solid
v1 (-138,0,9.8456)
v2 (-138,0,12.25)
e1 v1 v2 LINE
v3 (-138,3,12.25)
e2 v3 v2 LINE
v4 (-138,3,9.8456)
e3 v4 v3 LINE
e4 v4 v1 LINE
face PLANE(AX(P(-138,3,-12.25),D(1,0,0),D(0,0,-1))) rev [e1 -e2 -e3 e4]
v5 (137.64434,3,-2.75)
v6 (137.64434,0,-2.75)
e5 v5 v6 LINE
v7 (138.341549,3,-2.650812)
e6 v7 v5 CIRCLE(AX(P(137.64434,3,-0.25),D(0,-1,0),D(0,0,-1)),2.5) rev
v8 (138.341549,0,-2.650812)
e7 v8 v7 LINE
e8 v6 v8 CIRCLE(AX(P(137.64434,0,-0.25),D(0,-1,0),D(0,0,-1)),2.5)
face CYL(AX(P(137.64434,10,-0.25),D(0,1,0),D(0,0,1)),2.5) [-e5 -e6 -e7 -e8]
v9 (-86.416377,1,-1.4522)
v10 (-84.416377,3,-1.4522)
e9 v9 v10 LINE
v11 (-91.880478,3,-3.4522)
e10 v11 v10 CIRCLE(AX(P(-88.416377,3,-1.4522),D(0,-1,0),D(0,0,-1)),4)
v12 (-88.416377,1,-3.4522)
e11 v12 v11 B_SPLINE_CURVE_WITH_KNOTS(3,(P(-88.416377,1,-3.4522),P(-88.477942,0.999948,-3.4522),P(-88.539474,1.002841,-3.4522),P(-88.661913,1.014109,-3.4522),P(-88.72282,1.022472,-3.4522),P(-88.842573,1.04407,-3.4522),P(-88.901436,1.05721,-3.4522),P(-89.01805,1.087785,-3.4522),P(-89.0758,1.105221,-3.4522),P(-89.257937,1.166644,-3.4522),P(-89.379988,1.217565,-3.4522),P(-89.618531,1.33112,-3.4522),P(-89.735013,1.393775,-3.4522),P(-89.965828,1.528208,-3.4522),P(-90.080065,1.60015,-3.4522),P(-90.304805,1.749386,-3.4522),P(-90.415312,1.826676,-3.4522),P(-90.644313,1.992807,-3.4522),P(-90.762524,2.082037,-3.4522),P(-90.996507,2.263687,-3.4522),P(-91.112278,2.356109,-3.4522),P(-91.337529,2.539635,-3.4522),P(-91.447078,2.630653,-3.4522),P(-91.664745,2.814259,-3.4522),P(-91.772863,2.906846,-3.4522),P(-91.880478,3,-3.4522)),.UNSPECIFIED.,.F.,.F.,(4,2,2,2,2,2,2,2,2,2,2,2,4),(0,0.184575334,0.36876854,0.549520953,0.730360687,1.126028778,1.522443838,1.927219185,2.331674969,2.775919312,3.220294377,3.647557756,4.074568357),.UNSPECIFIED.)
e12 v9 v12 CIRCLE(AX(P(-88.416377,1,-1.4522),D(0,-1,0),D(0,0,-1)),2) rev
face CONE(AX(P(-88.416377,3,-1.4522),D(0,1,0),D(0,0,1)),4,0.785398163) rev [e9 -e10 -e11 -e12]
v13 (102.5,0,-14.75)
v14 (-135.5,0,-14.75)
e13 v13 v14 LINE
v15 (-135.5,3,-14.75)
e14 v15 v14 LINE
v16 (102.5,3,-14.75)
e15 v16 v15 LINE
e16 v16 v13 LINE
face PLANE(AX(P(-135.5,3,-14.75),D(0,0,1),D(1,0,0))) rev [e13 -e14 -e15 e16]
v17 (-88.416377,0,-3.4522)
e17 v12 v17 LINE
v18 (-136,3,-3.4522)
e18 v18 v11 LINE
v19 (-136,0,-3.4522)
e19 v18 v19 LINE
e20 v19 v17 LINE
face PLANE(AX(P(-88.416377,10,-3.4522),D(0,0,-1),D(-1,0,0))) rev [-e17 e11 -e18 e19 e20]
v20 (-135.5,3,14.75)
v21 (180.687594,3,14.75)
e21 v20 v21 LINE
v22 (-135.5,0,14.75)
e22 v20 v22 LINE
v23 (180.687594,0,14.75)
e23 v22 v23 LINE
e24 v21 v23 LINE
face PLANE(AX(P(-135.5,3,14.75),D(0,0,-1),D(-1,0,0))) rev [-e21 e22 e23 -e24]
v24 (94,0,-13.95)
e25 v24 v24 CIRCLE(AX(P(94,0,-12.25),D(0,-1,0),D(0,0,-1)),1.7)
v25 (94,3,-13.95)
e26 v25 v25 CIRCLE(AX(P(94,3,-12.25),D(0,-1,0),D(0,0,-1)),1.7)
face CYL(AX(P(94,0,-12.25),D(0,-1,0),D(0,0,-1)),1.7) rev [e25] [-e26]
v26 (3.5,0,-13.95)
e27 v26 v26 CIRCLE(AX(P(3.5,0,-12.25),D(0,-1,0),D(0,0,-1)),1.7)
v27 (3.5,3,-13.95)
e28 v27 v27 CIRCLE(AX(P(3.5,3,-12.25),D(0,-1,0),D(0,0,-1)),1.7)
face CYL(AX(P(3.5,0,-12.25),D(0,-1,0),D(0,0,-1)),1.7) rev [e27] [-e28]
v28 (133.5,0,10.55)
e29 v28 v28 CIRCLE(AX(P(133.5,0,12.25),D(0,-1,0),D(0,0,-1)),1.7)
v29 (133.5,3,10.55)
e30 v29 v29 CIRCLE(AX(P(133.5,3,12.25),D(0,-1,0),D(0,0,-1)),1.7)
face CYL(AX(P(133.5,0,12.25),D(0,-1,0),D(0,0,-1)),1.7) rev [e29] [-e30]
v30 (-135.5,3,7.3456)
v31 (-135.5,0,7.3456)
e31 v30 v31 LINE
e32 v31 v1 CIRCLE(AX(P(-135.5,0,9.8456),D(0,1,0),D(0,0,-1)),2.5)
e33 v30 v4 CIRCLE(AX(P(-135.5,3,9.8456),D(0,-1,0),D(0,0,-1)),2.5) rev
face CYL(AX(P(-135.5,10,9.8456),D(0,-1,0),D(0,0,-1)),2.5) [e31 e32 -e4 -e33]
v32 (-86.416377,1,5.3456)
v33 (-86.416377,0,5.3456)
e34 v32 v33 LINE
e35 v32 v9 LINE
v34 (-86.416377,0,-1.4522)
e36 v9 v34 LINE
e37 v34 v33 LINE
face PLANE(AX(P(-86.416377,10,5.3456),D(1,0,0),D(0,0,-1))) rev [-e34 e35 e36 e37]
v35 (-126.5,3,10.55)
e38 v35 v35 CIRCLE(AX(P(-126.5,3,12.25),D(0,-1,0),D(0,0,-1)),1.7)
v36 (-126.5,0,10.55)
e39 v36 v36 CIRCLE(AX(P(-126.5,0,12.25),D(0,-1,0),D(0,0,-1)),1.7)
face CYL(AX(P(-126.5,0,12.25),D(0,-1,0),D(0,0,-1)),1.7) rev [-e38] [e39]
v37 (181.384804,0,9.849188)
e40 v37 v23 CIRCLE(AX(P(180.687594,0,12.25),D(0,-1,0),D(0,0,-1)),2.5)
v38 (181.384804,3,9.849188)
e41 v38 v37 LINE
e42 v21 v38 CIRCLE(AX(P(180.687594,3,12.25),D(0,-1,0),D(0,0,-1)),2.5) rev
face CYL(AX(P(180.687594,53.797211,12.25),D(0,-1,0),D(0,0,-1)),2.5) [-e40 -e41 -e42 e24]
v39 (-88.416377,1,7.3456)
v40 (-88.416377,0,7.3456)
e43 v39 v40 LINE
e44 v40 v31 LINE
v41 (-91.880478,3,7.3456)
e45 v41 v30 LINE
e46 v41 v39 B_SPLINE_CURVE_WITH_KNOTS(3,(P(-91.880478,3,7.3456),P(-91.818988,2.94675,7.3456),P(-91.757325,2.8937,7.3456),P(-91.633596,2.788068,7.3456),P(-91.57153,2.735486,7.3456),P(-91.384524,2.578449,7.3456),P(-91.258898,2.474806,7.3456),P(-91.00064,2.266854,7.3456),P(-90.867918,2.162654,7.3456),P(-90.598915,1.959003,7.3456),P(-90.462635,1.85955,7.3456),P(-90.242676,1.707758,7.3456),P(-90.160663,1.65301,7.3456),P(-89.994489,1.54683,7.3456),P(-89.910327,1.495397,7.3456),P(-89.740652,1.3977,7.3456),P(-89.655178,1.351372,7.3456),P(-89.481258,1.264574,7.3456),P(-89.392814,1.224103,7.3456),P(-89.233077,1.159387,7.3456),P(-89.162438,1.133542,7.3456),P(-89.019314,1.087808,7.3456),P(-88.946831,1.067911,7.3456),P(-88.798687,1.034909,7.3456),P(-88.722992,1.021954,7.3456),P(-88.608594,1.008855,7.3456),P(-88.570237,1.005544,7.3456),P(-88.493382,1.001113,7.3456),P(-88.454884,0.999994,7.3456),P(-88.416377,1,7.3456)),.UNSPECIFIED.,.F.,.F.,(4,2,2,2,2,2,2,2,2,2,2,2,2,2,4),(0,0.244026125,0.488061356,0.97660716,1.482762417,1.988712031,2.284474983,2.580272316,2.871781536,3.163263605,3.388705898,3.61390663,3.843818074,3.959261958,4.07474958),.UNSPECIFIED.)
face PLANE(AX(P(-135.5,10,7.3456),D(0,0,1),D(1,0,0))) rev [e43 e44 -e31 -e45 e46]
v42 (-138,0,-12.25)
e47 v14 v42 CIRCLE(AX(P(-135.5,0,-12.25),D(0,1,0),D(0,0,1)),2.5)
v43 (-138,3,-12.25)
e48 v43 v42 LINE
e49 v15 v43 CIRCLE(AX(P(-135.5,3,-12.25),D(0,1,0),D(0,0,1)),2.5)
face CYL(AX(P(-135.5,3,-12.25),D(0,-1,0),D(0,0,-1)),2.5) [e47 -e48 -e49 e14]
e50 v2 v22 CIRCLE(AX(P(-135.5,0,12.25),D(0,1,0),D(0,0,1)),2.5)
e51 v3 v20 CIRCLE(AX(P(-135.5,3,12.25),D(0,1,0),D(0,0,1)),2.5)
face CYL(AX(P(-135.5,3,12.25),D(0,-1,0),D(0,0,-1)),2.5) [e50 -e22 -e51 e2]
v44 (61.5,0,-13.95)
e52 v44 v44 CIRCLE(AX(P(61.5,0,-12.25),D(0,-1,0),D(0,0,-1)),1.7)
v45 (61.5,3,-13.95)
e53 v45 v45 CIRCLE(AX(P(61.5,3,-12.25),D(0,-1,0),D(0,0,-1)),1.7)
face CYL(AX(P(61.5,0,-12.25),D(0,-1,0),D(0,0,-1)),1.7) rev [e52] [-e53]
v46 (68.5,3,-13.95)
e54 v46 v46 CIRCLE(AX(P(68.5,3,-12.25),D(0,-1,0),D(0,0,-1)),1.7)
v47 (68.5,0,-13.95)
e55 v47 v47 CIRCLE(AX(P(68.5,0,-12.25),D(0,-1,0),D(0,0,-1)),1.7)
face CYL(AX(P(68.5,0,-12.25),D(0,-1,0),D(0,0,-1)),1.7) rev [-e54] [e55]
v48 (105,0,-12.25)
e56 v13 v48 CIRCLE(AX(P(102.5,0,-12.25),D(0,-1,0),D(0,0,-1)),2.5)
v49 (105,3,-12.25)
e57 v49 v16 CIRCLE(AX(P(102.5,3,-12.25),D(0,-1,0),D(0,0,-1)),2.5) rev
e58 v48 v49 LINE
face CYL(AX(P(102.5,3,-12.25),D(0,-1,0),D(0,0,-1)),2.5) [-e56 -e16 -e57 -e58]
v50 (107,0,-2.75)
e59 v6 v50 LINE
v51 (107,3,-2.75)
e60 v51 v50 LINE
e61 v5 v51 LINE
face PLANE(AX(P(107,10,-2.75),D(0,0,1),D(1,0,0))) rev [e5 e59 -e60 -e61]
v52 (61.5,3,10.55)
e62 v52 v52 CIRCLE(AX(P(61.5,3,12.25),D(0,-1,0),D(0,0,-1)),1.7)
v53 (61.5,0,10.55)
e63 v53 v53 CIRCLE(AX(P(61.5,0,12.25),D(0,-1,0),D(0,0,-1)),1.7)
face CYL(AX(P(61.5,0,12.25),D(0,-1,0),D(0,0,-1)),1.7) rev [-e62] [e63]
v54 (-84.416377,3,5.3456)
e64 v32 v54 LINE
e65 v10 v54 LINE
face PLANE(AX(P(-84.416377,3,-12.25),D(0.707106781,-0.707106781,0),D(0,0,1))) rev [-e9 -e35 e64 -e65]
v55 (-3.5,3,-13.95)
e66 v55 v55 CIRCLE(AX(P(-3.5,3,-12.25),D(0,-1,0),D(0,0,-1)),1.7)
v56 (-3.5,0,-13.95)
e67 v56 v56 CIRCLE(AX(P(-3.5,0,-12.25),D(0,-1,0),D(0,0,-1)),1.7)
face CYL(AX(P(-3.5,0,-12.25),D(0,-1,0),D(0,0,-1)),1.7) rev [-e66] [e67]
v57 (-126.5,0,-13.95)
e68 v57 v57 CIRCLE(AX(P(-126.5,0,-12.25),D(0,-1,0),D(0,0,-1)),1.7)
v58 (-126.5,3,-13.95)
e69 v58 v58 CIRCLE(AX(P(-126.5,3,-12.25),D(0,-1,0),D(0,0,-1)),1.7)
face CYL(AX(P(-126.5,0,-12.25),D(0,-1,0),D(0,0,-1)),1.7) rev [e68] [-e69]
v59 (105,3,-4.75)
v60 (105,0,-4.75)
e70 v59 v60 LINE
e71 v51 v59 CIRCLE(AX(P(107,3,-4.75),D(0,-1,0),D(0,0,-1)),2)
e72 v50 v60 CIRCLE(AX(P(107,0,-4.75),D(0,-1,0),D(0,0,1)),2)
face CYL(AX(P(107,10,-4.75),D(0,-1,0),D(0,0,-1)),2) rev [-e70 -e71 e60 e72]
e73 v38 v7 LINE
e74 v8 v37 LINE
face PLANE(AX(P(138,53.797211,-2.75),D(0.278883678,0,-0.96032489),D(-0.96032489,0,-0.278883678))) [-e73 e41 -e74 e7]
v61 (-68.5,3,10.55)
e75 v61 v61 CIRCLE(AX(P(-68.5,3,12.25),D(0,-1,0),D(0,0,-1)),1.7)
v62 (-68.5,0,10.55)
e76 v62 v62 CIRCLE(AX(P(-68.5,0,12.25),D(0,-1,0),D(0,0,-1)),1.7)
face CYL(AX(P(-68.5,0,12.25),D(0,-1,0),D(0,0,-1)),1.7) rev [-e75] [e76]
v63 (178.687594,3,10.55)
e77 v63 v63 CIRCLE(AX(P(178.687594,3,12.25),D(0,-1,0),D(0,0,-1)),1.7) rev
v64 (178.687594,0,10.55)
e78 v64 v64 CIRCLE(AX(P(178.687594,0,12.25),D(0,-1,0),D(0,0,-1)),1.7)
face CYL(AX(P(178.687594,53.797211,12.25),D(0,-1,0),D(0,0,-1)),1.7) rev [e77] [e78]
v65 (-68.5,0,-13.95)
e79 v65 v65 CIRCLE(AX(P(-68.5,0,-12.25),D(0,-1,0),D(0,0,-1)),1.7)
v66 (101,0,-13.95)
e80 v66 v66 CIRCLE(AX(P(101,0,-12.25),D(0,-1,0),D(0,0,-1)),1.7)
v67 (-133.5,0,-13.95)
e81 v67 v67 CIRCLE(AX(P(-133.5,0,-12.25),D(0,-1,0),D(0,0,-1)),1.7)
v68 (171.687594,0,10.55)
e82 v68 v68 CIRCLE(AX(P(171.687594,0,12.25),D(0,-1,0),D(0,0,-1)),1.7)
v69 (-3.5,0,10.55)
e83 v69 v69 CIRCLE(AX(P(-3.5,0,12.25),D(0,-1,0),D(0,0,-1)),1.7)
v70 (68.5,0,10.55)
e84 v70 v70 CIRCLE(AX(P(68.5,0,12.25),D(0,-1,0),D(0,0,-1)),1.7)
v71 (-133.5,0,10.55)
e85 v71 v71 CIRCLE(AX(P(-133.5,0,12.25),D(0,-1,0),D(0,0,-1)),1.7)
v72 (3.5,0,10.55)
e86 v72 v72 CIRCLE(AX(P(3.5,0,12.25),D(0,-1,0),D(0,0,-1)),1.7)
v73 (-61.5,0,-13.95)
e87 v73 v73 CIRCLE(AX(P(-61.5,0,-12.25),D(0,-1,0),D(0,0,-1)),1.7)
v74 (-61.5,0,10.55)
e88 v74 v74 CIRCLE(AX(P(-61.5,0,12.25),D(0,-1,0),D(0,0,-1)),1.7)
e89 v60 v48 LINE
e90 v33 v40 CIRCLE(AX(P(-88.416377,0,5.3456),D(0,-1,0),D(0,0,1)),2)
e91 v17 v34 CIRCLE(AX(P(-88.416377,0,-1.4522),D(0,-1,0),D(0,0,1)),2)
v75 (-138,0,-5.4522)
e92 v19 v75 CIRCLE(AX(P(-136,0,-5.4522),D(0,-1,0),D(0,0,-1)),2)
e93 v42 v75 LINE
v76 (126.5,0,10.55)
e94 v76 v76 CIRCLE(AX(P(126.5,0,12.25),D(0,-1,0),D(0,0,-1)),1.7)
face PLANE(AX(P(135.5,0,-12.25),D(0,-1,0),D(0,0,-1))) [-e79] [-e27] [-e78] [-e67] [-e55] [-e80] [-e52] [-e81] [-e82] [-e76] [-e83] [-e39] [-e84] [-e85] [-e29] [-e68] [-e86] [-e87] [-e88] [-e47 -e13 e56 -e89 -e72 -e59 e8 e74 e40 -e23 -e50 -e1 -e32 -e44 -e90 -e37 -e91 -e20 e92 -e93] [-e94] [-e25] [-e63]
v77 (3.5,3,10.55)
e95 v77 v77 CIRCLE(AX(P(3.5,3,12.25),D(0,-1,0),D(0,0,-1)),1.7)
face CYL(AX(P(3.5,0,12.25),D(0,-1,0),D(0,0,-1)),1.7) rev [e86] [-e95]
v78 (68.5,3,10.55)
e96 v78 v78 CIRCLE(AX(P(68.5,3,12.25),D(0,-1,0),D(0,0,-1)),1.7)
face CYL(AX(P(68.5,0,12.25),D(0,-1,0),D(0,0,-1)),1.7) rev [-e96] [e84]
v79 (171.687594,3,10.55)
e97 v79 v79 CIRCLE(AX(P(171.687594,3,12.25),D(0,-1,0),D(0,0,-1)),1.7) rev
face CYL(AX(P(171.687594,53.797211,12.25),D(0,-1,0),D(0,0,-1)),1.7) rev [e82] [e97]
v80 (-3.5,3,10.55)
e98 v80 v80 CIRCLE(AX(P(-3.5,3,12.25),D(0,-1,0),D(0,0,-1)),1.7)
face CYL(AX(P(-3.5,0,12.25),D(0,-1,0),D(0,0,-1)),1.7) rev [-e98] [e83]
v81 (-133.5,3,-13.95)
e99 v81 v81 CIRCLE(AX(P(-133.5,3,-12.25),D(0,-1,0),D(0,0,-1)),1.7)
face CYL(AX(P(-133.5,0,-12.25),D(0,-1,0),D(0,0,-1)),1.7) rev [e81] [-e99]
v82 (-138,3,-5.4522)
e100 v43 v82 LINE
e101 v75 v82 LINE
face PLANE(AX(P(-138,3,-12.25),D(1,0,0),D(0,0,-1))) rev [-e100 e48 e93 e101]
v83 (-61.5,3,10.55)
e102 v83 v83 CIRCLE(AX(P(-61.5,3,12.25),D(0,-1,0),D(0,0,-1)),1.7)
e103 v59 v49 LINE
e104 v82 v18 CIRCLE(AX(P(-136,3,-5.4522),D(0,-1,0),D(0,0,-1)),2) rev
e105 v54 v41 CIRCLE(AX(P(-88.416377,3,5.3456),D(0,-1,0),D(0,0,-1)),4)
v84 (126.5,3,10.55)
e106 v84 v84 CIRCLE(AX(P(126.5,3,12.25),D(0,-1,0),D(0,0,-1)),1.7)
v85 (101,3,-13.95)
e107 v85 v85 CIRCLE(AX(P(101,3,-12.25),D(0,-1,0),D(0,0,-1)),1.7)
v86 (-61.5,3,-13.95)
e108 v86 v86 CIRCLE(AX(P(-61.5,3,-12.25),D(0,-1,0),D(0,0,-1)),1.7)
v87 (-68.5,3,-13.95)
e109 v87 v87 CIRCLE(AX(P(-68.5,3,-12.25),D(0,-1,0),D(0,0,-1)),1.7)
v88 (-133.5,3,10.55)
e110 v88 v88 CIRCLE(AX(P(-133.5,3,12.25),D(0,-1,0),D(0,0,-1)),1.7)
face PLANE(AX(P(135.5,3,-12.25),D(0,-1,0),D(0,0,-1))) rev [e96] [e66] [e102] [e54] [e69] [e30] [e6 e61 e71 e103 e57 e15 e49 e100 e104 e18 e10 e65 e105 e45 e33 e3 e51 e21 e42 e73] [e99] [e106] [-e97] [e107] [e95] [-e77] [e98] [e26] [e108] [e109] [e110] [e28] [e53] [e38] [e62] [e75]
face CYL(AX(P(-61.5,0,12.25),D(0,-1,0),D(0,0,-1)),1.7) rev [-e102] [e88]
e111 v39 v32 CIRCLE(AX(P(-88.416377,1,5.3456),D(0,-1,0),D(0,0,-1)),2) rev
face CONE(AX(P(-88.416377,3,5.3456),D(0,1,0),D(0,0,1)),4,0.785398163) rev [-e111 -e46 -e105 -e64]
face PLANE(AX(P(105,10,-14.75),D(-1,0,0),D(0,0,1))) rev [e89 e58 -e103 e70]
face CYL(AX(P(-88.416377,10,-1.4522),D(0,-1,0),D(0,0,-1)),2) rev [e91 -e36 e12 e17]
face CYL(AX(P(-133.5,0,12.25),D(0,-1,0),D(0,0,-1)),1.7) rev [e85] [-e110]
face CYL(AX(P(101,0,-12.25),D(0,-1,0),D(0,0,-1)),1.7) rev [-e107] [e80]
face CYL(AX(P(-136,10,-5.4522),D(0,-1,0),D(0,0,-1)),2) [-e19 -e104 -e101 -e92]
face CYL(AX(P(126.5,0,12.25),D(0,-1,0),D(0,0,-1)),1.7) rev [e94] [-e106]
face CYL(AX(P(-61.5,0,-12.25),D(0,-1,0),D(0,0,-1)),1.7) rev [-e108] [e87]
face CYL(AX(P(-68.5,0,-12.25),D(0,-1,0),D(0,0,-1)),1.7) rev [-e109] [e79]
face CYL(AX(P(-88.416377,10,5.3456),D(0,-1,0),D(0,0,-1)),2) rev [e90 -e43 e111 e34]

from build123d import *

# Parameters (mm, degrees)
BOSS_EXTRUDE1_DEPTH  = 3
M3_CLEARANCE_HOLE1_D = 3.4
CUT_EXTRUDE5_DEPTH   = 10
FILLET3_R            = 2
CHAMFER1_SIZE        = 2
SKETCH30_R           = 1.7
BOSS_EXTRUDE3_DEPTH  = 3
FILLET4_R            = 2.5


with BuildPart() as part:
    # Sketch1 → Boss-Extrude1 (new body)
    with BuildSketch(Plane(origin=(0, 0, 0), x_dir=(1, 0, 0), z_dir=(0, 1, 0))):
        with BuildLine():
            Line((-135.5, 14.75), (135.5, 14.75))
            ThreePointArc((135.5, 14.75), (137.267766953, 14.017766953), (138, 12.25))
            Line((138, 12.25), (138, -12.25))
            ThreePointArc((138, -12.25), (137.267766953, -14.017766953), (135.5, -14.75))
            Line((135.5, -14.75), (-135.5, -14.75))
            ThreePointArc((-135.5, -14.75), (-137.267766953, -14.017766953), (-138, -12.25))
            Line((-138, -12.25), (-138, 12.25))
            ThreePointArc((-138, 12.25), (-137.267766953, 14.017766953), (-135.5, 14.75))
        make_face()
    extrude(amount=BOSS_EXTRUDE1_DEPTH)

    # M3 Clearance Hole1 (through all)
    with Locations(Plane.XZ):
        with Locations((-133.5, 12.25), (-126.5, 12.25), (-133.5, -12.25), (-126.5, -12.25), (-68.5, 12.25), (-61.5, 12.25), (-68.5, -12.25), (-61.5, -12.25), (-3.5, 12.25), (3.5, 12.25), (-3.5, -12.25), (3.5, -12.25), (61.5, 12.25), (68.5, 12.25), (61.5, -12.25), (68.5, -12.25), (126.5, 12.25), (133.5, 12.25), (126.5, -12.25), (133.5, -12.25), (94, -12.25), (101, -12.25)):
            Hole(M3_CLEARANCE_HOLE1_D / 2)

    # Sketch29 → Cut-Extrude5 (cut)
    with BuildSketch(Plane.XZ):
        with BuildLine():
            Line((105, -14.75), (105, -4.75))
            ThreePointArc((105, -4.75), (105.585786438, -3.335786438), (107, -2.75))
            Line((107, -2.75), (138, -2.75))
            Line((138, -2.75), (138, -14.75))
            Line((138, -14.75), (105, -14.75))
        make_face()
        with BuildLine():
            Line((-86.41637679, 5.3456), (-86.41637679, -1.4522))
            ThreePointArc((-86.41637679, -1.4522), (-87.002163227, -2.866413562), (-88.41637679, -3.4522))
            Line((-88.41637679, -3.4522), (-138, -3.4522))
            Line((-138, -3.4522), (-138, 9.8456))
            ThreePointArc((-138, 9.8456), (-137.267766953, 8.077833047), (-135.5, 7.3456))
            Line((-135.5, 7.3456), (-88.41637679, 7.3456))
            ThreePointArc((-88.41637679, 7.3456), (-87.002163227, 6.759813562), (-86.41637679, 5.3456))
        make_face()
    extrude(amount=-CUT_EXTRUDE5_DEPTH, mode=Mode.SUBTRACT)

    # Fillet3
    fillet3_edges = [part.edges().sort_by_distance(p)[0] for p in [
        (-138, 1.5, -3.4522),
    ]]
    fillet(fillet3_edges, radius=FILLET3_R)

    # Chamfer1
    # the kernel refuses this chamfer: 2 mm, written as the material it takes off along each edge
    with BuildSketch(Plane(origin=(-88.41637679, 3, 5.3456), x_dir=(1, 0, 0), z_dir=(0, 0, -1))) as chamfer1_piece_1:
        Polygon((2, CHAMFER1_SIZE), (2 + CHAMFER1_SIZE, 0), (2, 0), align=None)
    revolve(axis=Axis((-88.41637679, 3, 5.3456), (0, -1, 0)), revolution_arc=237.405771779, mode=Mode.SUBTRACT)
    with BuildSketch(Plane(origin=(-86.41637679, 3, 5.3456), x_dir=(-0.027495876610589075, -0.9996219169112968, 0), z_dir=(0, 0, -1))) as chamfer1_piece_2:
        Polygon((CHAMFER1_SIZE * 0.999621916911, -CHAMFER1_SIZE * 0.0274958766106), (-CHAMFER1_SIZE * 0.0274958766106, -CHAMFER1_SIZE * 0.999621916911), (0, 0), align=None)
    extrude(amount=6.7978, mode=Mode.SUBTRACT)
    with BuildSketch(Plane(origin=(-88.41637679, 3, -1.4522), x_dir=(-0.5386859165215122, 0, 0.842506666645065), z_dir=(0.842506666645065, 0, 0.5386859165215122))) as chamfer1_piece_3:
        Polygon((2, CHAMFER1_SIZE), (2 + CHAMFER1_SIZE, 0), (2, 0), align=None)
    revolve(axis=Axis((-88.41637679, 3, -1.4522), (0, -1, 0)), revolution_arc=237.405771779, mode=Mode.SUBTRACT)

    # Sketch30 → Boss-Extrude3 (add)
    with BuildSketch(Plane.XZ):
        with BuildLine():
            Line((138, -2.75), (181.384803676, 9.849187775))
            ThreePointArc((181.384803676, 9.849187775), (183.162673325, 12.602114639), (180.687594482, 14.75))
            Line((180.687594482, 14.75), (135.5, 14.75))
            ThreePointArc((135.5, 14.75), (137.267766953, 14.017766953), (138, 12.25))
            Line((138, 12.25), (138, -2.75))
        make_face()
        with Locations(Location((171.687594482, 12.25, 0), (0, 0, 270))):
            Circle(SKETCH30_R, mode=Mode.SUBTRACT)
        with Locations(Location((178.687594482, 12.25, 0), (0, 0, 270))):
            Circle(SKETCH30_R, mode=Mode.SUBTRACT)
    extrude(amount=-BOSS_EXTRUDE3_DEPTH)

    # Fillet4
    fillet4_edges = [part.edges().sort_by_distance(p)[0] for p in [
        (105, 1.5, -14.75),
        (138, 1.5, -2.75),
    ]]
    fillet(fillet4_edges, radius=FILLET4_R)


solid = part.part
